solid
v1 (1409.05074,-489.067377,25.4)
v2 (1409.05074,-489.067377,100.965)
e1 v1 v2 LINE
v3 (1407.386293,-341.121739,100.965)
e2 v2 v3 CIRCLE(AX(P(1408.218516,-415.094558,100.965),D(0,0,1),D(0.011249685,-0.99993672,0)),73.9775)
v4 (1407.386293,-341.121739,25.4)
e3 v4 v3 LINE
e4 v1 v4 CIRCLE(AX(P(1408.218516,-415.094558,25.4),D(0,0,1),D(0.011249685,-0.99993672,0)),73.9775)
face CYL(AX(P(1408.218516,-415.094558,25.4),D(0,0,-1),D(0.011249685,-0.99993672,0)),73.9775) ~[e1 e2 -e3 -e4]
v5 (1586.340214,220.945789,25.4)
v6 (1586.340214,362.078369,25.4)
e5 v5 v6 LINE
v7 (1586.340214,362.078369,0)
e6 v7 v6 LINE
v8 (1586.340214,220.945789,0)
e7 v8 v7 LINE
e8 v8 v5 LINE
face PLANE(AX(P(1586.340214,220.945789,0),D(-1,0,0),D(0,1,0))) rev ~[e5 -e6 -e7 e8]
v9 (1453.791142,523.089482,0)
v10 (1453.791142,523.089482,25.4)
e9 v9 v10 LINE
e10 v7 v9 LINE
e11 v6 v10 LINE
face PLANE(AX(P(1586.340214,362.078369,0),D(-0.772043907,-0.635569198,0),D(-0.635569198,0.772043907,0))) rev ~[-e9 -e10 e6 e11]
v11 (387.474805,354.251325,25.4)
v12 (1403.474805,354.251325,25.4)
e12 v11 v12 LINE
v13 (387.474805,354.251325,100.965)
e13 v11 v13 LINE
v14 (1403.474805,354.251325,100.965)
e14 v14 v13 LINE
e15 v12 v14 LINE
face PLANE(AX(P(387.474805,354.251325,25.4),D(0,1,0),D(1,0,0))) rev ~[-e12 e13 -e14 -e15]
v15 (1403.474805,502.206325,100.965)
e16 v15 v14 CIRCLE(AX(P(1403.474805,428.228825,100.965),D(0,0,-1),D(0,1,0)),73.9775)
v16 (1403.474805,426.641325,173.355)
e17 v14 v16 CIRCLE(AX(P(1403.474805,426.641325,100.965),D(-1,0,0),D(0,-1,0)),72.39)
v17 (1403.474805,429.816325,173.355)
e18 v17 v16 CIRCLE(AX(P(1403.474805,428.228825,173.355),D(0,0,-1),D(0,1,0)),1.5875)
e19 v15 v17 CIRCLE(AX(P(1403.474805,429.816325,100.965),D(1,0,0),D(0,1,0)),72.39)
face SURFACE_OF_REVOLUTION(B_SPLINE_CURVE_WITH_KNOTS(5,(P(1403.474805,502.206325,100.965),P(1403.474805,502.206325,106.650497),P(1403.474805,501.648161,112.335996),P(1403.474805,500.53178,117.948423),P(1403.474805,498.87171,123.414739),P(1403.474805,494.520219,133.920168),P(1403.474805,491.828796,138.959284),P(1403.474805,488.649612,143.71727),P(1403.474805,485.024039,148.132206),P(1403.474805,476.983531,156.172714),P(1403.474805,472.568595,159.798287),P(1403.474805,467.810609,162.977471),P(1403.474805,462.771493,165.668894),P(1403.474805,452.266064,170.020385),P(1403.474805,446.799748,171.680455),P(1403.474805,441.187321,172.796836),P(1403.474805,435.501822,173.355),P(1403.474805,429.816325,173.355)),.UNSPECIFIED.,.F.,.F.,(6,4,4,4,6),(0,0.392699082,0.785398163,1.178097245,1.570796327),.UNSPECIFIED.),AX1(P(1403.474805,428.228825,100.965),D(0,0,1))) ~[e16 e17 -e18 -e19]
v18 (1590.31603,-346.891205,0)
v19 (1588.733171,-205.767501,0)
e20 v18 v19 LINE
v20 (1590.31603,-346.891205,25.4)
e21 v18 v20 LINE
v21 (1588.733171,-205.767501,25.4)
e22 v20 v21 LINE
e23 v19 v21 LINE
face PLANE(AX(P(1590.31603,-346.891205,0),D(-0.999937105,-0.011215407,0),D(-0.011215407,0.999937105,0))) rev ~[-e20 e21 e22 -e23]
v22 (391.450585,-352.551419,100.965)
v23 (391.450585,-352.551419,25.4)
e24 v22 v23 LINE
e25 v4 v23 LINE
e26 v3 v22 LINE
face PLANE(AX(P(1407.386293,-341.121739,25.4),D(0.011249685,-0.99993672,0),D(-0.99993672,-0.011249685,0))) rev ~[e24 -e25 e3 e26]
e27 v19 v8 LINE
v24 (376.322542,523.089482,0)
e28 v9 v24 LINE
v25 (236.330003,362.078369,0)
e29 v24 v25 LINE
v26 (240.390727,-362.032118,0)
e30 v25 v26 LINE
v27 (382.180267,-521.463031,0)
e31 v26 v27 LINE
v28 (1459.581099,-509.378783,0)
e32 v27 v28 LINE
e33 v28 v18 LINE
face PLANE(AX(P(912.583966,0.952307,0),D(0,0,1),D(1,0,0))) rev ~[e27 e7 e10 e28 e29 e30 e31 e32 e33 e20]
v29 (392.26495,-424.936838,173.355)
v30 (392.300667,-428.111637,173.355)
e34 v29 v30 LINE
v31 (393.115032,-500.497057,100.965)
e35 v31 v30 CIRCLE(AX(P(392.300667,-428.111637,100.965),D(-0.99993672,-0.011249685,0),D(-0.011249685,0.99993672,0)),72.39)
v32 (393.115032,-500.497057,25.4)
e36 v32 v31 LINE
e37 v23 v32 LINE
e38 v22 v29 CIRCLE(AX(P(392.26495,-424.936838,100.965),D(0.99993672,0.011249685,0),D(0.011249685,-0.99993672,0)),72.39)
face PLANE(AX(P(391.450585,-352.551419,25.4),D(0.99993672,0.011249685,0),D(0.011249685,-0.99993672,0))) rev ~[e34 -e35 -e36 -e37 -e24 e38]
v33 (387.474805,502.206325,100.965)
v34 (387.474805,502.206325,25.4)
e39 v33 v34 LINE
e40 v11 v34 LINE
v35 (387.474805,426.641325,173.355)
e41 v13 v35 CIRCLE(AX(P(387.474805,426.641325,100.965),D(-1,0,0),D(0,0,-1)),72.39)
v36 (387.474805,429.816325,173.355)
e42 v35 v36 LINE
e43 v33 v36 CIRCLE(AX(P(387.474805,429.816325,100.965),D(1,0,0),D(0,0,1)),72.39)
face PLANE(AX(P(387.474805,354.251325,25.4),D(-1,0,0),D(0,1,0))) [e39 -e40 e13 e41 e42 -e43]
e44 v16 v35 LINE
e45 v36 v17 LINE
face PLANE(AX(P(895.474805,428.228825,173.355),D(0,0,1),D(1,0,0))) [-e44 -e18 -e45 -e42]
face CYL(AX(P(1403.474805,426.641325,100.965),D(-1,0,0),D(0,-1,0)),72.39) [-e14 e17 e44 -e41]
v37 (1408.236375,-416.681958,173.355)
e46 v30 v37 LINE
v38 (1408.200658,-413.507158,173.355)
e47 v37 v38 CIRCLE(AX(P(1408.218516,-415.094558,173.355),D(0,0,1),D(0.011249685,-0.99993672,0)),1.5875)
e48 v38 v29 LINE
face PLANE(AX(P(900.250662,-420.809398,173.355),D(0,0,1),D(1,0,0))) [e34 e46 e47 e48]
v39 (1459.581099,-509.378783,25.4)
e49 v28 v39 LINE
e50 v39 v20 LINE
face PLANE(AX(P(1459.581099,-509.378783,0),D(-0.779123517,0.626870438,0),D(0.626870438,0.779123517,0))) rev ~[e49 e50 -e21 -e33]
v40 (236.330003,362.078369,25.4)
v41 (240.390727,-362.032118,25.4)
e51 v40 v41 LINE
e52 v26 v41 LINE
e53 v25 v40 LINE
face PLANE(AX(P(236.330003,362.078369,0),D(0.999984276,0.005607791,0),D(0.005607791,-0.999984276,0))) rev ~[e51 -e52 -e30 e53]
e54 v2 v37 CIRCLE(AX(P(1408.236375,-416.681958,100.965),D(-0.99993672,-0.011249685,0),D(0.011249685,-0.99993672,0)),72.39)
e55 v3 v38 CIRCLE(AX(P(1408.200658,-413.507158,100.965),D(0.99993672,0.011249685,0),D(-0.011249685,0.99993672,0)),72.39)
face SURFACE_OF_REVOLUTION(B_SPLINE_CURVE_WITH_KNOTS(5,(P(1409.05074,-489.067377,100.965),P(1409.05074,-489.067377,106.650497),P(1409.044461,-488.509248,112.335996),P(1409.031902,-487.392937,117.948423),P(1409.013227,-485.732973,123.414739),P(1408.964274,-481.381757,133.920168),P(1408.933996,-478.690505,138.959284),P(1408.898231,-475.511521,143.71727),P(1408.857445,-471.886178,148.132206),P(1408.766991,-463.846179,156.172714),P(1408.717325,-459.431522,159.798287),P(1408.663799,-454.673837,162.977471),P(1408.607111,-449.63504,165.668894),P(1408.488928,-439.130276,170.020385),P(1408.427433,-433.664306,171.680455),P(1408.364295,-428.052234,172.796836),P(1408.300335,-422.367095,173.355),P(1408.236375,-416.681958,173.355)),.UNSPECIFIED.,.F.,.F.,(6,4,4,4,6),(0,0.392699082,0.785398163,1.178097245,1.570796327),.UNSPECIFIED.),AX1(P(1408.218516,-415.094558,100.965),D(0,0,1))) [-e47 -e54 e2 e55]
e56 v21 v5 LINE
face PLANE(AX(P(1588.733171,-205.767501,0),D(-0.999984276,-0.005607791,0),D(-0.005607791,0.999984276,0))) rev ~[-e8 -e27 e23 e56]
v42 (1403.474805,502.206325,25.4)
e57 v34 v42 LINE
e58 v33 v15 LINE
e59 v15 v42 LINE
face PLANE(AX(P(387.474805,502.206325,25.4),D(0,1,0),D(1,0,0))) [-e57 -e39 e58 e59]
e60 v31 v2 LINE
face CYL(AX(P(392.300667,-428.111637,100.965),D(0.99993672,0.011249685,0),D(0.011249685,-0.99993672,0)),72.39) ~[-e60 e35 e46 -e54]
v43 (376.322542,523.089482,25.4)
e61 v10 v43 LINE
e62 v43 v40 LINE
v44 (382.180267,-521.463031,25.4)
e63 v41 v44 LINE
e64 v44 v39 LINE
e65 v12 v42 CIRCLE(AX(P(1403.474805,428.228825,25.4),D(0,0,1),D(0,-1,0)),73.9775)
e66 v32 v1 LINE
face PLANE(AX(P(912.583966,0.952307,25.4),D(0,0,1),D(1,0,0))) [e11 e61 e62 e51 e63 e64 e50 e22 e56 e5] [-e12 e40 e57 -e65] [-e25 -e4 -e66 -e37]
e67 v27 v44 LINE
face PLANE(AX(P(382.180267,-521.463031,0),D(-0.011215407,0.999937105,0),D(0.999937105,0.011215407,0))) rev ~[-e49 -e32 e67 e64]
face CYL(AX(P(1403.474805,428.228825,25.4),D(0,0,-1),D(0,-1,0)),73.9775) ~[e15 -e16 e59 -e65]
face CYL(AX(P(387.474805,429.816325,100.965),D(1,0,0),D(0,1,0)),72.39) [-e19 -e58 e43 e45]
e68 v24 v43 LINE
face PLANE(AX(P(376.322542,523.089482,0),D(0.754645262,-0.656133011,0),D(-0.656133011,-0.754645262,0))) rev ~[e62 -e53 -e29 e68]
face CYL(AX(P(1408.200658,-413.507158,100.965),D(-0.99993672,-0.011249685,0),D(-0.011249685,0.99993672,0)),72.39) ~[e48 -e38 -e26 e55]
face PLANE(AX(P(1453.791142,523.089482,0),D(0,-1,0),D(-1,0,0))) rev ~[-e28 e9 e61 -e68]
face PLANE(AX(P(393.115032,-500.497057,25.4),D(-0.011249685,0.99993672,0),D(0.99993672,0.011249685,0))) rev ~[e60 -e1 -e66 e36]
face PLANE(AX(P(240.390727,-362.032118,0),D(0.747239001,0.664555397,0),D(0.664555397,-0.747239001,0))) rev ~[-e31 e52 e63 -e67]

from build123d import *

# Parameters (mm, degrees)
F2_DEPTH = 25.4
F3_W     = 1016
F3_H     = 147.955
F4_DEPTH = 147.955
F5_DEPTH = 133.5532
F6_R     = 72.39
F7_R     = 72.39


# Not quite as in the source:
# - a feature names something its author has since deleted; it is built from what else it names


with BuildPart() as f2:
    # F1 (on face) → F2 (new body)
    with BuildSketch(Plane.XY):
        Polygon((319.0343479268, 457.2), (236.3300025423, 362.0783686638), (240.3907269744, -362.0321180929), (325.0280779844, -457.2), (1501.5633212704, -457.2), (1590.3160302528, -346.8912047778), (1588.7331709988, -205.7675014721), (1587.5366926193, 7.5891437009), (1586.3402142398, 220.9457888739), (1586.3402142398, 362.0783686638), (1508.033296253, 457.2), align=None)
        Polygon((376.3225418129, 523.0894817851), (319.0343479268, 457.2), (1508.033296253, 457.2), (1453.79114151, 523.0894817851), align=None)
        Polygon((1501.5633212704, -457.2), (325.0280779844, -457.2), (382.1802665493, -521.4630312406), (1459.5810992365, -509.3787828947), align=None)
    extrude(amount=F2_DEPTH)

    # F3 (on face) → F4 (join)
    with BuildSketch(Plane.XY.offset(25.4)):
        with Locations((895.4748051167, 428.2288251305)):
            Rectangle(F3_W, F3_H)
        with BuildLine():
            Line((1403.4748051167, 502.2063251305), (1403.4748051167, 354.2513251305))
            ThreePointArc((1403.4748051167, 354.2513251305), (1477.4523051167, 428.2288251305), (1403.4748051167, 502.2063251305))
        make_face()
        Polygon((391.4505850052, -352.5514191944), (393.1150321411, -500.4970566453), (1409.0507399579, -489.0673767425), (1407.3862928221, -341.1217392917), align=None)
        with BuildLine():
            Line((1407.3862928221, -341.1217392917), (1409.0507399579, -489.0673767425))
            ThreePointArc((1409.0507399579, -489.0673767425), (1482.1913351154, -414.2623344491), (1407.3862928221, -341.1217392917))
        make_face()
    extrude(amount=F4_DEPTH)

    # F3 (on face) → F5 (join)
    with BuildSketch(Plane.XY.offset(25.4)):
        with Locations((895.4748051167, 428.2288251305)):
            Rectangle(F3_W, F3_H)
        with BuildLine():
            Line((1403.4748051167, 502.2063251305), (1403.4748051167, 354.2513251305))
            ThreePointArc((1403.4748051167, 354.2513251305), (1477.4523051167, 428.2288251305), (1403.4748051167, 502.2063251305))
        make_face()
        Polygon((391.4505850052, -352.5514191944), (393.1150321411, -500.4970566453), (1409.0507399579, -489.0673767425), (1407.3862928221, -341.1217392917), align=None)
        with BuildLine():
            Line((1407.3862928221, -341.1217392917), (1409.0507399579, -489.0673767425))
            ThreePointArc((1409.0507399579, -489.0673767425), (1482.1913351154, -414.2623344491), (1407.3862928221, -341.1217392917))
        make_face()
    extrude(amount=F5_DEPTH)

    # F6
    f6_edges = [f2.edges().sort_by_distance(p)[0] for p in [
        (895.474805, 502.206325, 173.355),
        (1477.452305, 428.228825, 173.355),
        (895.474805, 354.251325, 173.355),
    ]]
    fillet(f6_edges, radius=F6_R)

    # F7
    f7_edges = [f2.edges().sort_by_distance(p)[0] for p in [
        (899.418439, -346.836579, 173.355),
        (1482.191335, -414.262334, 173.355),
        (901.082886, -494.782217, 173.355),
    ]]
    fillet(f7_edges, radius=F7_R)


solid = f2.part
